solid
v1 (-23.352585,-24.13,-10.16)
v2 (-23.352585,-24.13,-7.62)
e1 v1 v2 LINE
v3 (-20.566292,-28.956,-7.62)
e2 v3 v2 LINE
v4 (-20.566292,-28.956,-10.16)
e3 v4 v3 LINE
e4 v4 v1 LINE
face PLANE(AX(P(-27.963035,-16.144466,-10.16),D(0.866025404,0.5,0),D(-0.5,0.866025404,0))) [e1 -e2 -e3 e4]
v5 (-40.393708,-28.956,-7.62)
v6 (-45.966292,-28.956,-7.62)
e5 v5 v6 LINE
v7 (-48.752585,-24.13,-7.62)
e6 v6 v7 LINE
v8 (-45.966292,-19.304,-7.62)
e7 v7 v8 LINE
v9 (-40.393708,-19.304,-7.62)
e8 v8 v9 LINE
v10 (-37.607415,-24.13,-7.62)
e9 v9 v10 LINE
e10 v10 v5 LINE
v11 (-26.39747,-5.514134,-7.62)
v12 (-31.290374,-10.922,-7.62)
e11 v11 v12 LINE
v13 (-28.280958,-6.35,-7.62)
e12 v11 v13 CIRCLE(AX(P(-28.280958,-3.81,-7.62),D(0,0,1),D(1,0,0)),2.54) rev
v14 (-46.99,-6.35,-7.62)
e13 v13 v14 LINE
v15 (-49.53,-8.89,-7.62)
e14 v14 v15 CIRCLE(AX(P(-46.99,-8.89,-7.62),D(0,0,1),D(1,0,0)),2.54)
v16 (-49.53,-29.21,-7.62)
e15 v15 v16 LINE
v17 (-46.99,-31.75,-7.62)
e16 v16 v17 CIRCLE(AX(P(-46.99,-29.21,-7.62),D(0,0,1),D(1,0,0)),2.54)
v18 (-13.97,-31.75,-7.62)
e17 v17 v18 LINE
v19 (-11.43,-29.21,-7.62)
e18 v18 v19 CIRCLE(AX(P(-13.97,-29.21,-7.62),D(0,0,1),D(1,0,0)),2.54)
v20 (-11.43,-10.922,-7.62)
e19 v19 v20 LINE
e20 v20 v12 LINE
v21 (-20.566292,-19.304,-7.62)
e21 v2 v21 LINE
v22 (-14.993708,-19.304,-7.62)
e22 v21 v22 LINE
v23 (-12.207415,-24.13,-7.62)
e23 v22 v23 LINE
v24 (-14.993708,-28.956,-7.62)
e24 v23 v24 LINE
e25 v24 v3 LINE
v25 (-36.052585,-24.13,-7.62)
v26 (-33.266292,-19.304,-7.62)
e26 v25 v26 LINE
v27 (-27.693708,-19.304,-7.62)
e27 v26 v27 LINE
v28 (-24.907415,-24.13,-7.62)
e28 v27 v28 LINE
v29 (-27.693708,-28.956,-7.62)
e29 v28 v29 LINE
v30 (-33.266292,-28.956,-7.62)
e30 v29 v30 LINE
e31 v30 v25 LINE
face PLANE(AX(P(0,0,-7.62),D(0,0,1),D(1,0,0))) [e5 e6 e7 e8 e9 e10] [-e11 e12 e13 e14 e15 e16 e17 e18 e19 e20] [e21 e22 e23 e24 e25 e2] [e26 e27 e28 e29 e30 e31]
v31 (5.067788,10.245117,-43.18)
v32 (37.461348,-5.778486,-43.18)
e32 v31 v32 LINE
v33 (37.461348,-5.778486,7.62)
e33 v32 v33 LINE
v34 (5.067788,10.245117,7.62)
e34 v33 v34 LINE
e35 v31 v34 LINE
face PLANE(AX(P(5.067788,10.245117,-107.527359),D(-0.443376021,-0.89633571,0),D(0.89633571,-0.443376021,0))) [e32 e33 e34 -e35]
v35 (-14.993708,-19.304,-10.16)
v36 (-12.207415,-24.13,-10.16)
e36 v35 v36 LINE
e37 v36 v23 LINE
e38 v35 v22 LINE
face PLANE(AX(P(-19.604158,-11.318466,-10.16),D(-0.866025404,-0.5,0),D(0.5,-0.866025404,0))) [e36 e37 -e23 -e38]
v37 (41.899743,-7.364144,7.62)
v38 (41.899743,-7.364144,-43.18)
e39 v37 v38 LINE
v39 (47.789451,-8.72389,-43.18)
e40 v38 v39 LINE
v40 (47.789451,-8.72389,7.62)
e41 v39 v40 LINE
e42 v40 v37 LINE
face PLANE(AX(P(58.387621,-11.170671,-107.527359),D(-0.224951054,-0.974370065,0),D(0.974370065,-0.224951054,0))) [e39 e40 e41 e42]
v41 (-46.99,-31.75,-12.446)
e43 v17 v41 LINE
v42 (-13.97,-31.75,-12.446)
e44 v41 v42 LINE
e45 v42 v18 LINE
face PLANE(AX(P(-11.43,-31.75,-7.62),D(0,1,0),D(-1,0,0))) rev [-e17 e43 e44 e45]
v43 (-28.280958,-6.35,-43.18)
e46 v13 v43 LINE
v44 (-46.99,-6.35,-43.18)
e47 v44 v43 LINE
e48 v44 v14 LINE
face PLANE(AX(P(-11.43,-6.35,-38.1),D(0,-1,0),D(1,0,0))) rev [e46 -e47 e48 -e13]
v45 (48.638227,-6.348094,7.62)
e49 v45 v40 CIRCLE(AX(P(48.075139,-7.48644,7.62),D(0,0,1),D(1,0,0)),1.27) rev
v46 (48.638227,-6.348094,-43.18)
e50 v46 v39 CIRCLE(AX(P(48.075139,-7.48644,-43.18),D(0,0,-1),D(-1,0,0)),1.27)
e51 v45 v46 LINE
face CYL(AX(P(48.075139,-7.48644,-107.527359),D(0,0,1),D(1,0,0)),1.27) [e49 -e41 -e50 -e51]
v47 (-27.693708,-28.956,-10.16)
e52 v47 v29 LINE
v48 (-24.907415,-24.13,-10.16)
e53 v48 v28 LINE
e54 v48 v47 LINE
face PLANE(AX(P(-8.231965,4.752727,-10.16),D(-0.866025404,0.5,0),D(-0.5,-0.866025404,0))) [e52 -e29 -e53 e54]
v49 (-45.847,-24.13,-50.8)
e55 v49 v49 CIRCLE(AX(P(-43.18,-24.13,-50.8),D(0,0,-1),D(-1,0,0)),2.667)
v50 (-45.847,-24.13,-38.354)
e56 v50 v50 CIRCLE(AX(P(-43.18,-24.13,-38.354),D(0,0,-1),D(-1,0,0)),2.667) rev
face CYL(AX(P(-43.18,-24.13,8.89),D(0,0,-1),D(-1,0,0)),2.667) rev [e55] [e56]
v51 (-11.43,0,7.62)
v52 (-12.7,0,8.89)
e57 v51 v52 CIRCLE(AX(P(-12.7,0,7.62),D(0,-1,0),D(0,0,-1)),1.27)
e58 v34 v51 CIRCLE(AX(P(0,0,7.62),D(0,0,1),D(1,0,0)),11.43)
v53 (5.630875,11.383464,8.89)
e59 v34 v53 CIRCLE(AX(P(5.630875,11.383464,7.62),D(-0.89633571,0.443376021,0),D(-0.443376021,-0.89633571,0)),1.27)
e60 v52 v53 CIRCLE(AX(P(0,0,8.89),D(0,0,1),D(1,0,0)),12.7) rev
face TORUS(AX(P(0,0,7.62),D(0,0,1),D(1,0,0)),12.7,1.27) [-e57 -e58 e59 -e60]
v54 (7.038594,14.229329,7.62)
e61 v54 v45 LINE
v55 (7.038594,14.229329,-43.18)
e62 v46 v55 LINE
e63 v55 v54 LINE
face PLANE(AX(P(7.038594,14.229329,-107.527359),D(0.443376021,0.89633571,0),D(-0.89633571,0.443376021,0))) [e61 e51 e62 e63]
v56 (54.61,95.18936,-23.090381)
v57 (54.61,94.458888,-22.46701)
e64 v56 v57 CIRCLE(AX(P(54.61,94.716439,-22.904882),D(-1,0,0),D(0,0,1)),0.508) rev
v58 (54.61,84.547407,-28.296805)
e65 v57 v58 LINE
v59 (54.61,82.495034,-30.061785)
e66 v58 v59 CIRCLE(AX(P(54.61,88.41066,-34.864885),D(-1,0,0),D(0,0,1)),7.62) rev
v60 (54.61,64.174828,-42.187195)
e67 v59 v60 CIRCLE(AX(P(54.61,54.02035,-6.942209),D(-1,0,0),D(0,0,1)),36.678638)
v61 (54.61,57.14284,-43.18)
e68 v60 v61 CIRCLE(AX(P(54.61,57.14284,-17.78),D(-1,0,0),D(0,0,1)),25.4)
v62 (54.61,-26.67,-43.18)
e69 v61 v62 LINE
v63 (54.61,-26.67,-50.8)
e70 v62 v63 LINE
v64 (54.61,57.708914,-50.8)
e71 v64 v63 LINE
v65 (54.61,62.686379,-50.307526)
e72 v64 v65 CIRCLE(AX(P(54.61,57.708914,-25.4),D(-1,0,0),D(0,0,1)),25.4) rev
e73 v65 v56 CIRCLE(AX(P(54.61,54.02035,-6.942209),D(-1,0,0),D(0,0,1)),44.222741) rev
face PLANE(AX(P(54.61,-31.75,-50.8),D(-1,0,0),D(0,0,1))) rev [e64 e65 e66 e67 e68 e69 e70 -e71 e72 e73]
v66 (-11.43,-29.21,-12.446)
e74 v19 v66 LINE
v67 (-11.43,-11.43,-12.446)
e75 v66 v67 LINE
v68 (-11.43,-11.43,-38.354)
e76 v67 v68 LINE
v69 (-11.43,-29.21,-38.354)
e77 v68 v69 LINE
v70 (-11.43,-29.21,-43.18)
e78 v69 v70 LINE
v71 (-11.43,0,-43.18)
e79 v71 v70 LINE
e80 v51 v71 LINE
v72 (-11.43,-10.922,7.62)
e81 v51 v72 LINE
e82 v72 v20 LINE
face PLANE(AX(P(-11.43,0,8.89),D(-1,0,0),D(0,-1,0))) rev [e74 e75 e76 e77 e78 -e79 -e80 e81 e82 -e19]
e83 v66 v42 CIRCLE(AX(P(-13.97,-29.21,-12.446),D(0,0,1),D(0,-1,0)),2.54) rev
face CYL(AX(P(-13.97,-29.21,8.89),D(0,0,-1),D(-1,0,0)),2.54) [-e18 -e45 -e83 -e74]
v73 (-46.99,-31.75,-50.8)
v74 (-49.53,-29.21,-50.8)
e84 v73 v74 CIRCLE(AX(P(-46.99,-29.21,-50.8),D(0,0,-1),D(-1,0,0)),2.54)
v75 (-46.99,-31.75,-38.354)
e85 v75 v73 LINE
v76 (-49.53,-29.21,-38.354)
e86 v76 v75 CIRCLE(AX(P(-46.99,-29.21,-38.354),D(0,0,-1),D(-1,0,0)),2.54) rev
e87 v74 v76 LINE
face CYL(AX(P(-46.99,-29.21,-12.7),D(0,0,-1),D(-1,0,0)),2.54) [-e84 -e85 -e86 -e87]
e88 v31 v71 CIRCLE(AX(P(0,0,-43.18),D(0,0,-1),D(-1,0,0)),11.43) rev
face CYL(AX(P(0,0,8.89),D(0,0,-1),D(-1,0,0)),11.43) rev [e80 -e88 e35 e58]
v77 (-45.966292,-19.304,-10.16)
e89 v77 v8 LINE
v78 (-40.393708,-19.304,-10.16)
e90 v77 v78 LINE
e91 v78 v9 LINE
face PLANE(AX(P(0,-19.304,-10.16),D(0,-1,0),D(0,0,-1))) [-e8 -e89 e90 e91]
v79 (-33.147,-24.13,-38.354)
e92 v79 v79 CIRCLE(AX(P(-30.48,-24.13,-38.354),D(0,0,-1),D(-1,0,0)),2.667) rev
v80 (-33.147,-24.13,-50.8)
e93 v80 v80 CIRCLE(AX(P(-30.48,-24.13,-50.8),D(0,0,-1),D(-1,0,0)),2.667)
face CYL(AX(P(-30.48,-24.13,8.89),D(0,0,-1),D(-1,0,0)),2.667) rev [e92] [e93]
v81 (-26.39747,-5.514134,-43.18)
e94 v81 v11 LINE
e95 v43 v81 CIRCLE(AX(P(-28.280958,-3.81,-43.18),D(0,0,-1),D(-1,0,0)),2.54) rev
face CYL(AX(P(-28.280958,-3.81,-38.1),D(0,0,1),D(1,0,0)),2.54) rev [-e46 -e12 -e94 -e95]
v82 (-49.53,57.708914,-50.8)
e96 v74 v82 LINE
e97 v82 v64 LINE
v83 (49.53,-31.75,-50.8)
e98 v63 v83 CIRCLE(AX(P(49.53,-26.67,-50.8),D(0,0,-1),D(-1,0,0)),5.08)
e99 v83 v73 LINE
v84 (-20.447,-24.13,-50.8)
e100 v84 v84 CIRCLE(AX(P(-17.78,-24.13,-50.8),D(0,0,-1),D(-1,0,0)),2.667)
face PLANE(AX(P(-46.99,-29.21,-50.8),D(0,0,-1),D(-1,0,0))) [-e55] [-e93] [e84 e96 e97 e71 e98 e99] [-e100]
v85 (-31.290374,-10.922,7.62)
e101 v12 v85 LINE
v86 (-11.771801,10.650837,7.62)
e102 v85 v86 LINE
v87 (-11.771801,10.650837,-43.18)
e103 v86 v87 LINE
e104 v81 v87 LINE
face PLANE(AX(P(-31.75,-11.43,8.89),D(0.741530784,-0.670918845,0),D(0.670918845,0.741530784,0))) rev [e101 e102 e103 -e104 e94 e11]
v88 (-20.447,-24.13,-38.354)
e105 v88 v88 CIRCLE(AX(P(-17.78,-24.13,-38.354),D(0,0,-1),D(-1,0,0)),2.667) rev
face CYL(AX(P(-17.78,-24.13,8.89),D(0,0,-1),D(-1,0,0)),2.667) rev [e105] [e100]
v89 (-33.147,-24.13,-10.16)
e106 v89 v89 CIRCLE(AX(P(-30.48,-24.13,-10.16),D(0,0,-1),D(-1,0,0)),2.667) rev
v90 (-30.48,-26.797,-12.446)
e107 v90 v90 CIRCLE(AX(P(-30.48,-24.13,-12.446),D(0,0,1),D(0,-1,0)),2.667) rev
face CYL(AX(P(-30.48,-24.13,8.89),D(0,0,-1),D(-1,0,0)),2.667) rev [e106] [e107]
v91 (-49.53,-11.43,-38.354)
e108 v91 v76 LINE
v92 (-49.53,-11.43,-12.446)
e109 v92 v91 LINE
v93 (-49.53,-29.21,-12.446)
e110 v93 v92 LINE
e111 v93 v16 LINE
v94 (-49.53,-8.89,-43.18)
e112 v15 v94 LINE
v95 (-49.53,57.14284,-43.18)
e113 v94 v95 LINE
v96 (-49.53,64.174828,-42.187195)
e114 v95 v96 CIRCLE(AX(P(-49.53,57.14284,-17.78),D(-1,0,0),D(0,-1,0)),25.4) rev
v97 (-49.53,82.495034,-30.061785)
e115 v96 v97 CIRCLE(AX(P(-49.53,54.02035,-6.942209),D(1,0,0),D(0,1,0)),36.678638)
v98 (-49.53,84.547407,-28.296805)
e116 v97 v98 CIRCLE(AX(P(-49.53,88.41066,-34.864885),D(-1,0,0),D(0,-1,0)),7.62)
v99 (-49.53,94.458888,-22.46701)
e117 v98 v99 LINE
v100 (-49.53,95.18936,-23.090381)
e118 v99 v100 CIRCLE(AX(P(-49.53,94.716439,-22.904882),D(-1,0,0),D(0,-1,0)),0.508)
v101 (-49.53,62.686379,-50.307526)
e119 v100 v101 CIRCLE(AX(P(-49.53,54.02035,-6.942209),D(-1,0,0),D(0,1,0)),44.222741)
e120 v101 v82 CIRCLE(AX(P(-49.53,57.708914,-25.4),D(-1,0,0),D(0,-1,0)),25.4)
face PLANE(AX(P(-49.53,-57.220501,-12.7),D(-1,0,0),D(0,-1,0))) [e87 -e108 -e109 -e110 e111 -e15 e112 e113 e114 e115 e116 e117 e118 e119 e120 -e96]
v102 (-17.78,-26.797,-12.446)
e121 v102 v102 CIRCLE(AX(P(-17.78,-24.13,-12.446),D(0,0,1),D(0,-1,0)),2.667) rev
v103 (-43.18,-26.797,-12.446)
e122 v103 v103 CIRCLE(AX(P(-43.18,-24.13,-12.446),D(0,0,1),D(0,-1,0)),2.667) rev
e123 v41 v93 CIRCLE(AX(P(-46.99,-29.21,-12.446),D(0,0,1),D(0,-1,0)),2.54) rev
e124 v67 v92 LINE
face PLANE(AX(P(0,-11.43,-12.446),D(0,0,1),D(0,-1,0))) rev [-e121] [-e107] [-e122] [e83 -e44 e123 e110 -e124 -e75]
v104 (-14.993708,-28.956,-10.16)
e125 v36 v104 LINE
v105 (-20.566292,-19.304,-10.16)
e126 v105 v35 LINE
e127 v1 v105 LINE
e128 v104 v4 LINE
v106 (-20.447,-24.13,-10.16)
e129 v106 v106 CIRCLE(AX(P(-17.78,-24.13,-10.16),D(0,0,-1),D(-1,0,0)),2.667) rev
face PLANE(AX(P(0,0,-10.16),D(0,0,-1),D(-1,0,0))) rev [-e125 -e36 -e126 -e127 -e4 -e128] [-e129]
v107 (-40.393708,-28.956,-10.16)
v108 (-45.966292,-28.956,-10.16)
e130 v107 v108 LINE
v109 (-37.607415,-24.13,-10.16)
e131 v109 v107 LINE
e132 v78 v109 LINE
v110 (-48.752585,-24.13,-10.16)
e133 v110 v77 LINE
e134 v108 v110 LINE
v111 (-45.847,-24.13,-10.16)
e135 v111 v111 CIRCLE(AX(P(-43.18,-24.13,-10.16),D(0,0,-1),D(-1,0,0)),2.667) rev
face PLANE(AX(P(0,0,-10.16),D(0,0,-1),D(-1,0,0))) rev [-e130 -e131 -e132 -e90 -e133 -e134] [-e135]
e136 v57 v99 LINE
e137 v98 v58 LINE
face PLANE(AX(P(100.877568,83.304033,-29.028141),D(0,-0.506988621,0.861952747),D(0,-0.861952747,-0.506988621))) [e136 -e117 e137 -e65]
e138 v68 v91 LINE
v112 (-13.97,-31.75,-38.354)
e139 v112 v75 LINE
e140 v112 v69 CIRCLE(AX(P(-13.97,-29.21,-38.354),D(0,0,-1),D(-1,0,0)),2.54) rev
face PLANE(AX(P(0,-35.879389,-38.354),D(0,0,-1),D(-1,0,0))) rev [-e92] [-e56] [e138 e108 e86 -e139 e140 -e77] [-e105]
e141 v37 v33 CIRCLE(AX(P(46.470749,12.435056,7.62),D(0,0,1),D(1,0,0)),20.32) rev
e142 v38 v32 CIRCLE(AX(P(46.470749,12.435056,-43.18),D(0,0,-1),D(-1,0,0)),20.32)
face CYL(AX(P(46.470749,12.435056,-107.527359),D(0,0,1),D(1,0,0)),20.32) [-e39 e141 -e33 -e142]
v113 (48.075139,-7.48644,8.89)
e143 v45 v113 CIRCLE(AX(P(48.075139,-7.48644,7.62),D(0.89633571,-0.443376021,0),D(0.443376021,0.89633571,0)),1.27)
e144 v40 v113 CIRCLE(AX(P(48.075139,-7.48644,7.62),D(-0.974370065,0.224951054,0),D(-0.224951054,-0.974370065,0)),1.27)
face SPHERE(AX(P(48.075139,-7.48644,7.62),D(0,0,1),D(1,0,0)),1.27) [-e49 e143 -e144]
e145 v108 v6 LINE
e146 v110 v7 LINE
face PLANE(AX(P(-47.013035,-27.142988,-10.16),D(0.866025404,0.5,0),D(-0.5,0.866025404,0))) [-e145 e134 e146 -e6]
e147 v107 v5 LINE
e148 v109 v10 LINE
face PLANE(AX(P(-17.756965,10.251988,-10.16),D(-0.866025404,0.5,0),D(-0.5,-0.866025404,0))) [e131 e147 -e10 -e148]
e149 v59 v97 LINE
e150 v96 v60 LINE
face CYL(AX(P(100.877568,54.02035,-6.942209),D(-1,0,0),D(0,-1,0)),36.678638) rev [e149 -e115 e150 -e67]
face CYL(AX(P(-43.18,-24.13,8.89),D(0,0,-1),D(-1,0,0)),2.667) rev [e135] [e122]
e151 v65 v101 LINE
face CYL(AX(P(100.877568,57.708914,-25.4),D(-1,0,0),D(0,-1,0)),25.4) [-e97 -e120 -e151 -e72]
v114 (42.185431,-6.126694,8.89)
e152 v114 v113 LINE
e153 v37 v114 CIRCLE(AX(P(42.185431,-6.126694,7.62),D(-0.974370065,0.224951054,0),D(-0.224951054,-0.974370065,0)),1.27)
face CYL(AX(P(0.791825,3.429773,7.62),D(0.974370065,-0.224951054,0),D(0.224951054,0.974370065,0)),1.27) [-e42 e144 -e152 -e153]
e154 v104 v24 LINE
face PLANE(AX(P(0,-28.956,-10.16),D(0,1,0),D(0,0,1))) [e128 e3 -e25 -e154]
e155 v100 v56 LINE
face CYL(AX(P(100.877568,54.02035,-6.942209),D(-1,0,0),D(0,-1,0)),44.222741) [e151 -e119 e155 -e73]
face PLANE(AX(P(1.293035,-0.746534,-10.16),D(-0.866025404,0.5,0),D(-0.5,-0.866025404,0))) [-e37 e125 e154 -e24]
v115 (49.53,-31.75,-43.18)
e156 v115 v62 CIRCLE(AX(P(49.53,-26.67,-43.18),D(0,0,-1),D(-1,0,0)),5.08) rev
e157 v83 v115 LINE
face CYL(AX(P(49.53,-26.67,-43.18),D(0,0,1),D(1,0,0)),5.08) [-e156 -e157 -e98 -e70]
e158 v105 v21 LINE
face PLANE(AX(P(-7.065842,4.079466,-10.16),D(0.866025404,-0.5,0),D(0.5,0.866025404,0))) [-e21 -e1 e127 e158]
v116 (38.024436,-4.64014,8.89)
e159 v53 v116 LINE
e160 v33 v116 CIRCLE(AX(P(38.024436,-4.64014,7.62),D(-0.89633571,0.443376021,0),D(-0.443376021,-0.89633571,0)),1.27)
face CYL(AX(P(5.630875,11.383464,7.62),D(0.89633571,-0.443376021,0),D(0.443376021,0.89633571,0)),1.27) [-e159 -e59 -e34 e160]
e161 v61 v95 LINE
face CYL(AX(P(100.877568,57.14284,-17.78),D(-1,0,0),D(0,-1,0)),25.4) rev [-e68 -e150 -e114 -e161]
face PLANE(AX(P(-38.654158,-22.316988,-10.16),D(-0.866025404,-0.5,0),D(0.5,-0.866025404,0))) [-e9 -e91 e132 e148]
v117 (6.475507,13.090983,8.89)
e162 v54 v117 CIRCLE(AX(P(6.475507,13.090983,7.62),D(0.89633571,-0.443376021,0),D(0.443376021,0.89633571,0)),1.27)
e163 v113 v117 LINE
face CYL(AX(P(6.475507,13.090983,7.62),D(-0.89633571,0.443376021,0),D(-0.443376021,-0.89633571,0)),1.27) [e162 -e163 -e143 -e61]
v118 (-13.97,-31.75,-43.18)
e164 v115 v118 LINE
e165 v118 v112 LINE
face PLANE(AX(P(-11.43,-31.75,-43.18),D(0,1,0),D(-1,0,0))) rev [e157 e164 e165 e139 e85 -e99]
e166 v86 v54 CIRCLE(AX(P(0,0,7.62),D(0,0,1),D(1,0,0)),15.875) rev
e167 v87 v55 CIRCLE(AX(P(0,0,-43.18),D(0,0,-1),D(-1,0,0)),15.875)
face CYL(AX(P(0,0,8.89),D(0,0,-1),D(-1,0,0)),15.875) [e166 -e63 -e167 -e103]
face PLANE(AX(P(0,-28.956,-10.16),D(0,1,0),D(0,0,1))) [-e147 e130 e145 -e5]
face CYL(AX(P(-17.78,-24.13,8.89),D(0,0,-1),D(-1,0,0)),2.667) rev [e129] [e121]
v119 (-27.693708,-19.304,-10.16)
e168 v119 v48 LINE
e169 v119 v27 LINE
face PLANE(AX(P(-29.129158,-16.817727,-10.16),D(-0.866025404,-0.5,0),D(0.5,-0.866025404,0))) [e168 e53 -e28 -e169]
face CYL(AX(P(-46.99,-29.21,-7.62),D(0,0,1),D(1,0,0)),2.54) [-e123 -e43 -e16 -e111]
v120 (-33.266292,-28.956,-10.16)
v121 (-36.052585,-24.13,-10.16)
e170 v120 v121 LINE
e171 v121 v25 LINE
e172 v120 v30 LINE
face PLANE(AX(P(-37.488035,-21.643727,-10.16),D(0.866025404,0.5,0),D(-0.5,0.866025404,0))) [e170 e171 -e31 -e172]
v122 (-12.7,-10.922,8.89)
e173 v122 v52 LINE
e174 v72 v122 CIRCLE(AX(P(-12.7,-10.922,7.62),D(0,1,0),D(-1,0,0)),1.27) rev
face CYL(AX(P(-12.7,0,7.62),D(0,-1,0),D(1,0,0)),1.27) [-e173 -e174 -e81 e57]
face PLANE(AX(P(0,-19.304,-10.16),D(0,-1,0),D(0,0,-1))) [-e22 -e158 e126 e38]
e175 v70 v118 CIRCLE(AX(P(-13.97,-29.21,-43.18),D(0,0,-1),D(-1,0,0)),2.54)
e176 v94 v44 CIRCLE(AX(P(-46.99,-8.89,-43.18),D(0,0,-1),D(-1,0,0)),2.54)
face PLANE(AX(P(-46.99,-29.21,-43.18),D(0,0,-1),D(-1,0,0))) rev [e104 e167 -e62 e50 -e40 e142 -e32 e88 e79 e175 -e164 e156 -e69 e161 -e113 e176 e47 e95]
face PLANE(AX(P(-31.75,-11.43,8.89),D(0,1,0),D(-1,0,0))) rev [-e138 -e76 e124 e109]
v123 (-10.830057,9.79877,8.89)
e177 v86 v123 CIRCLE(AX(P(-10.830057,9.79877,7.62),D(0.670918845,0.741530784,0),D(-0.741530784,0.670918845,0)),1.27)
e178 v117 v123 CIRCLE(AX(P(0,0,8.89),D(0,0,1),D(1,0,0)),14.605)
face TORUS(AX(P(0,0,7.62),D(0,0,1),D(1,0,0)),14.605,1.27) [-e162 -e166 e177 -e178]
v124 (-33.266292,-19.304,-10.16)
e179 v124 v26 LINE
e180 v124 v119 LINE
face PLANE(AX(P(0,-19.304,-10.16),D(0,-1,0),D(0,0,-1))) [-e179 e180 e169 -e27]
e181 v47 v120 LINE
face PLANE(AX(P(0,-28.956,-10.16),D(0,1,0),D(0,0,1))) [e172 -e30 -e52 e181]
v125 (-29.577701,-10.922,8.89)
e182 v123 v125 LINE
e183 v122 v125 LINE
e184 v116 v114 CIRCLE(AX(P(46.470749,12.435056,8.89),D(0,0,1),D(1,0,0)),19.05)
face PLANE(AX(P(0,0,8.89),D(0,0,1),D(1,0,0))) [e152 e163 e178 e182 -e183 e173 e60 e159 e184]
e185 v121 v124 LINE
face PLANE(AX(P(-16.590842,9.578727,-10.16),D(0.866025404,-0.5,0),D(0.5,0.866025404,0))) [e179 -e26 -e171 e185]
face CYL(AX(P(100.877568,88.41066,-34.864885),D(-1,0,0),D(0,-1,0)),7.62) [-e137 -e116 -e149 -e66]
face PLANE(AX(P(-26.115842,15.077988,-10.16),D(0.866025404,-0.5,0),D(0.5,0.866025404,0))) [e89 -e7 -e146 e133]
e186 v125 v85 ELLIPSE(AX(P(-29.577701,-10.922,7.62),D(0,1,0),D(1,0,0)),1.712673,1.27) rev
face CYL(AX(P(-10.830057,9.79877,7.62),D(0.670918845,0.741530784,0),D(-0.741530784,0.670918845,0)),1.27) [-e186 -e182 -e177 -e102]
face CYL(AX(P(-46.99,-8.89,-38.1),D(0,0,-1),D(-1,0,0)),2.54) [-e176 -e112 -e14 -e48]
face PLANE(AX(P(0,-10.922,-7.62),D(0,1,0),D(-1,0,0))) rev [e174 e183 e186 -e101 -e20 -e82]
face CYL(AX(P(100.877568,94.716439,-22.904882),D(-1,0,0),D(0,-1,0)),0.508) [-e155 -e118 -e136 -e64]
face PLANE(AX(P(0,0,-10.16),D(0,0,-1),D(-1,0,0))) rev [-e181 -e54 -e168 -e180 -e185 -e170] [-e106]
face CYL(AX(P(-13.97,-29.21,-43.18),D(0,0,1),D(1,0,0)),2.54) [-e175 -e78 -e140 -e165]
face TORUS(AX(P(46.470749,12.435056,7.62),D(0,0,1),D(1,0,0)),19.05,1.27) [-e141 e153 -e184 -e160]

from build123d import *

# Parameters (mm, degrees)
BOSS_EXTRUDE1_DEPTH  = 8.889999999999999
BOSS_EXTRUDE2_DEPTH  = 38.1
SKETCH15_W           = 41.9077442661452
SKETCH15_H           = 43.17111295633907
CUT_EXTRUDE2_DEPTH   = 97.53600000000003
BOSS_EXTRUDE5_START  = 12.7
BOSS_EXTRUDE5_DEPTH  = 12.7
BOSS_EXTRUDE6_DEPTH  = 5.08
BOSS_EXTRUDE7_DEPTH  = 5.08
BOSS_EXTRUDE9_START  = -25.4
BOSS_EXTRUDE9_DEPTH  = 5.08
SKETCH20_R           = 2.6670000000000025
SKETCH20_R_2         = 2.6669999999999994
CUT_EXTRUDE3_DEPTH   = 79.56569416736545
BOSS_EXTRUDE10_START = 43.18
BOSS_EXTRUDE10_DEPTH = 43.18
FILLET2_R            = 2.54
CUT_EXTRUDE4_DEPTH   = 2.54
SKETCH22_W           = 21.77675569209209
SKETCH22_H           = 4.484390369282897
CUT_EXTRUDE5_DEPTH   = 73.97805012467812
BOSS_EXTRUDE11_START = 7.62
SKETCH23_R           = 2.6669999999999994
SKETCH23_R_2         = 2.6670000000000025
BOSS_EXTRUDE11_DEPTH = 7.62
FILLET3_R            = 5.08
BOSS_EXTRUDE12_START = -52.07
BOSS_EXTRUDE12_DEPTH = 52.07
FILLET4_R            = 1.27
FILLET5_R            = 20.32
BOSS_EXTRUDE13_DEPTH = 104.14
FILLET6_R            = 0.508
FILLET7_R            = 7.619999999999999
FILLET8_R            = 25.4
FILLET9_R            = 1.27


with BuildPart() as part:
    # Sketch1 → Boss-Extrude1 (new body)
    with BuildSketch(Plane.XY):
        with BuildLine():
            Line((-31.75, -11.43), (-11.429999999999998, -11.429999999999993))
            Line((-11.429999999999998, -11.429999999999993), (-11.43, 0))
            ThreePointArc((-11.43, 0), (7e-16, 11.43), (11.43, 0))
            Line((11.43, 0), (11.429999999999998, -11.42999999999999))
            Line((11.429999999999998, -11.42999999999999), (31.75, -11.429999999999993))
            Line((31.75, -11.429999999999993), (11.77180119767475, 10.650836660207654))
            ThreePointArc((11.77180119767475, 10.650836660207654), (9.7e-16, 15.875), (-11.771801197674753, 10.65083666020765))
            Line((-11.771801197674753, 10.65083666020765), (-31.75, -11.43))
        make_face()
    extrude(amount=BOSS_EXTRUDE1_DEPTH)

    # Sketch11 → Boss-Extrude2 (add)
    with BuildSketch(Plane(origin=(0, 0, 0), x_dir=(-1, 0, 0), z_dir=(0, 0, -1))):
        Polygon((27.153740742364707, -6.350000000000002), (31.75, -11.43), (11.429999999999998, -11.429999999999993), (11.429999999999996, -6.349999999999992), align=None)
    extrude(amount=BOSS_EXTRUDE2_DEPTH)

    # Sketch15 → Cut-Extrude2 (cut)
    with BuildSketch(Plane.XY.offset(8.889999999999999)):
        with Locations((20.9538721330726, 0.9898585075243087)):
            Rectangle(SKETCH15_W, SKETCH15_H)
    extrude(amount=-CUT_EXTRUDE2_DEPTH, mode=Mode.SUBTRACT)

    # Sketch16 → Boss-Extrude5 (add)
    with BuildSketch(Plane(origin=(0, 0, 0), x_dir=(-1, 0, 0), z_dir=(0, 0, -1)).offset(BOSS_EXTRUDE5_START)):
        with BuildLine():
            Line((11.771801197674753, 10.65083666020765), (27.153740742364707, -6.350000000000003))
            Line((27.153740742364707, -6.350000000000003), (11.429999999999996, -6.349999999999992))
            Line((11.429999999999996, -6.349999999999992), (11.43, -3.9e-15))
            ThreePointArc((11.43, -3.9e-15), (8.082230508962239, 8.082230508962237), (0, 11.43))
            Line((0, 11.43), (0, 15.875))
            ThreePointArc((0, 15.875), (6.4394717570311455, 14.510300771879203), (11.771801197674753, 10.65083666020765))
        make_face()
    extrude(amount=-BOSS_EXTRUDE5_DEPTH)

    # Sketch18 → Boss-Extrude6 (add)
    with BuildSketch(Plane(origin=(4.2e-15, -6.3499999999999845, 0), x_dir=(1, 2.8e-16, 0), z_dir=(-2.8e-16, 1, 0))):
        Polygon((-11.430000000000001, 12.70000000000001), (-49.53, 12.700000000000006), (-49.53, 38.099999999999994), (-11.43, 38.1), align=None)
    extrude(amount=-BOSS_EXTRUDE6_DEPTH)

    # Sketch19 → Boss-Extrude7 (add)
    with BuildSketch(Plane(origin=(0, 0, -38.1), x_dir=(-1, 0, 0), z_dir=(0, 0, -1))):
        Polygon((11.429999999999998, -6.349999999999998), (49.53, -6.349999999999991), (49.53, -31.749999999999986), (11.43, -31.75), align=None)
    extrude(amount=BOSS_EXTRUDE7_DEPTH)

    # Sketch19<3> → Boss-Extrude9 (add)
    with BuildSketch(Plane(origin=(0, 0, -38.1), x_dir=(-1, 0, 0), z_dir=(0, 0, -1)).offset(BOSS_EXTRUDE9_START)):
        Polygon((11.429999999999998, -6.349999999999998), (49.53, -6.349999999999991), (49.53, -31.749999999999986), (11.43, -31.75), align=None)
    extrude(amount=-BOSS_EXTRUDE9_DEPTH)

    # Sketch20 → Cut-Extrude3 (cut, through all)
    with BuildSketch(Plane(origin=(0, 0, -43.18), x_dir=(-1, 0, 0), z_dir=(0, 0, -1))):
        with Locations(Location((30.48, -24.129999999999992, 0), (0, 0, 180))):
            Circle(SKETCH20_R)
        with Locations(Location((17.78, -24.129999999999992, 0), (0, 0, 180))):
            Circle(SKETCH20_R_2)
        with Locations(Location((43.17999999999999, -24.129999999999992, 0), (0, 0, 180))):
            Circle(SKETCH20_R)
    extrude(amount=-CUT_EXTRUDE3_DEPTH, mode=Mode.SUBTRACT)

    # Sketch16<2> → Boss-Extrude10 (add)
    with BuildSketch(Plane(origin=(0, 0, 0), x_dir=(-1, 0, 0), z_dir=(0, 0, -1)).offset(BOSS_EXTRUDE10_START)):
        with BuildLine():
            Line((11.771801197674753, 10.65083666020765), (27.153740742364707, -6.350000000000003))
            Line((27.153740742364707, -6.350000000000003), (11.429999999999996, -6.349999999999992))
            Line((11.429999999999996, -6.349999999999992), (11.43, -3.9e-15))
            ThreePointArc((11.43, -3.9e-15), (8.082230508962239, 8.082230508962237), (0, 11.43))
            Line((0, 11.43), (0, 15.875))
            ThreePointArc((0, 15.875), (6.4394717570311455, 14.510300771879203), (11.771801197674753, 10.65083666020765))
        make_face()
    extrude(amount=-BOSS_EXTRUDE10_DEPTH)

    # Fillet2
    fillet2_edges = [part.edges().sort_by_distance(p)[0] for p in [
        (-11.43, -31.75, -40.64),
        (-49.53, -31.749999999999986, -40.64),
        (-11.43, -31.75, -10.160000000000004),
        (-27.153740742364704, -6.35, -25.400000000000002),
        (-49.53, -31.749999999999986, -10.160000000000004),
        (-49.53, -6.349999999999991, -25.400000000000002),
    ]]
    fillet(fillet2_edges, radius=FILLET2_R)

    # Sketch21 → Cut-Extrude4 (cut)
    with BuildSketch(Plane.XY.offset(-7.620000000000012)):
        Polygon((-27.69370760089086, -19.303999999999988), (-33.26629239910914, -19.303999999999988), (-36.052584798218284, -24.129999999999992), (-33.26629239910914, -28.955999999999996), (-27.693707600890868, -28.955999999999996), (-24.907415201781728, -24.129999999999985), align=None)
        Polygon((-40.393707600890856, -19.303999999999988), (-45.96629239910914, -19.303999999999988), (-48.75258479821828, -24.129999999999992), (-45.96629239910914, -28.955999999999996), (-40.39370760089086, -28.955999999999996), (-37.60741520178173, -24.129999999999985), align=None)
        Polygon((-14.99370760089086, -19.303999999999988), (-20.56629239910914, -19.303999999999988), (-23.352584798218277, -24.129999999999992), (-20.56629239910914, -28.955999999999996), (-14.993707600890867, -28.955999999999996), (-12.20741520178173, -24.129999999999985), align=None)
    extrude(amount=-CUT_EXTRUDE4_DEPTH, mode=Mode.SUBTRACT)

    # Sketch22 → Cut-Extrude5 (cut, through all)
    with BuildSketch(Plane.ZY.offset(49.53)):
        Polygon((-38.354, -11.42999999999998), (-12.446000000000005, -11.42999999999998), (-12.446000000000002, -35.87938903250851), (-38.354, -35.87938903250852), align=None)
        with Locations((3.268377846046038, -13.16419518464144)):
            Rectangle(SKETCH22_W, SKETCH22_H)
    extrude(amount=-CUT_EXTRUDE5_DEPTH, mode=Mode.SUBTRACT)

    # Sketch23 → Boss-Extrude11 (add)
    with BuildSketch(Plane(origin=(0, 0, -43.18), x_dir=(-1, 0, 0), z_dir=(0, 0, -1)).offset(BOSS_EXTRUDE11_START)):
        with BuildLine():
            Line((46.990000000000016, -31.749999999999993), (-54.60999999999998, -31.75))
            Line((-54.60999999999998, -31.75), (-54.60999999999998, 59.690000000000005))
            Line((-54.60999999999998, 59.690000000000005), (49.52999999999999, 59.690000000000005))
            Line((49.52999999999999, 59.690000000000005), (49.53, -29.209999999999987))
            ThreePointArc((49.53, -29.209999999999987), (48.786051224213836, -31.006051224213813), (46.990000000000016, -31.749999999999993))
        make_face()
        with Locations((17.78, -24.129999999999992)):
            Circle(SKETCH23_R, mode=Mode.SUBTRACT)
        with Locations((30.48, -24.129999999999992)):
            Circle(SKETCH23_R_2, mode=Mode.SUBTRACT)
        with Locations((43.17999999999999, -24.129999999999992)):
            Circle(SKETCH23_R_2, mode=Mode.SUBTRACT)
    extrude(amount=-BOSS_EXTRUDE11_DEPTH)

    # Fillet3
    fillet3_edges = [part.edges().sort_by_distance(p)[0] for p in [
        (54.60999999999998, -31.75, -46.989999999999995),
    ]]
    fillet(fillet3_edges, radius=FILLET3_R)

    # Sketch24 → Boss-Extrude12 (add)
    with BuildSketch(Plane.XY.offset(8.889999999999999).offset(BOSS_EXTRUDE12_START)):
        with BuildLine():
            Line((5.067787914863957, 10.245117161358323), (39.587974363799084, -6.83043023839146))
            Line((39.587974363799084, -6.83043023839146), (58.38762081865667, -11.17067060922455))
            Line((58.38762081865667, -11.17067060922455), (7.03859432619994, 14.229329390775446))
            ThreePointArc((7.03859432619994, 14.229329390775446), (3.6142095208661993, 15.458108375195204), (0, 15.875))
            Line((0, 15.875), (-7e-16, 11.43))
            ThreePointArc((-7e-16, 11.43), (2.6022308550236635, 11.129838030140547), (5.067787914863957, 10.245117161358323))
        make_face()
    extrude(amount=BOSS_EXTRUDE12_DEPTH)

    # Fillet4
    # the kernel refuses this fillet: 1.27 mm, written as the material it takes off along each edge
    with BuildSketch(Plane(origin=(58.38762081865667, -11.17067060922455, -43.18), x_dir=(-0.8963357096551464, 0.4433760205480277, 0), z_dir=(0, 0, 1))) as fillet4_piece_1:
        with BuildLine():
            CenterArc((FILLET4_R * 8.56452358423, FILLET4_R), FILLET4_R, 103.31948375813553, 166.68051624186455)
            Line((FILLET4_R * 8.3341429253, FILLET4_R * 1.97310058678), (0, 0))
            Line((0, 0), (FILLET4_R * 8.56452358423, -1.2e-16))
        make_face()
    extrude(amount=79.2623623799331, mode=Mode.SUBTRACT)

    # Fillet5
    fillet5_edges = [part.edges().sort_by_distance(p)[0] for p in [
        (39.587974363799084, -6.83043023839146, -17.145),
    ]]
    fillet(fillet5_edges, radius=FILLET5_R)

    # Sketch25 → Boss-Extrude13 (add)
    with BuildSketch(Plane.ZY.offset(49.53)):
        with BuildLine():
            Line((-29.028140773868504, 83.30403252851806), (-21.7408262217295, 95.69350349416987))
            ThreePointArc((-21.7408262217295, 95.69350349416987), (-41.35451230486861, 81.7952335654154), (-50.800000000000004, 59.69000000000002))
            Line((-50.800000000000004, 59.69000000000002), (-43.18, 59.69000000000002))
            ThreePointArc((-43.18, 59.69000000000002), (-38.40361060567099, 72.87512775034637), (-29.028140773868504, 83.30403252851806))
        make_face()
    extrude(amount=-BOSS_EXTRUDE13_DEPTH)

    # Fillet6
    fillet6_edges = [part.edges().sort_by_distance(p)[0] for p in [
        (2.5399999999999707, 95.69350349416987, -21.7408262217295),
    ]]
    fillet(fillet6_edges, radius=FILLET6_R)

    # Fillet7
    fillet7_edges = [part.edges().sort_by_distance(p)[0] for p in [
        (2.539999999999978, 83.30403252851806, -29.028140773868504),
    ]]
    fillet(fillet7_edges, radius=FILLET7_R)

    # Fillet8
    fillet8_edges = [part.edges().sort_by_distance(p)[0] for p in [
        (2.539999999999999, 59.690000000000005, -50.8),
        (2.539999999999999, 59.690000000000005, -43.18),
    ]]
    fillet(fillet8_edges, radius=FILLET8_R)

    # Fillet9
    fillet9_edges = [part.edges().sort_by_distance(p)[0] for p in [
        (-21.531087635955615, -0.13558166989617781, 8.889999999999999),
        (-11.43, -5.460999999999997, 8.889999999999999),
        (-2.9668526046512183, 15.59530091477155, 8.889999999999999),
        (21.264567959032345, 2.2333155514035123, 8.889999999999999),
        (27.83841048622558, 3.940617675038018, 8.889999999999999),
        (49.271107203403254, -7.9137111445449655, 8.89),
        (44.84459728880309, -8.044017264516304, 8.889999999999999),
        (39.63441669939814, -6.700434090326565, 8.89),
        (-6.029928860820195, 9.710039028420407, 8.889999999999999),
    ]]
    fillet(fillet9_edges, radius=FILLET9_R)


solid = part.part
